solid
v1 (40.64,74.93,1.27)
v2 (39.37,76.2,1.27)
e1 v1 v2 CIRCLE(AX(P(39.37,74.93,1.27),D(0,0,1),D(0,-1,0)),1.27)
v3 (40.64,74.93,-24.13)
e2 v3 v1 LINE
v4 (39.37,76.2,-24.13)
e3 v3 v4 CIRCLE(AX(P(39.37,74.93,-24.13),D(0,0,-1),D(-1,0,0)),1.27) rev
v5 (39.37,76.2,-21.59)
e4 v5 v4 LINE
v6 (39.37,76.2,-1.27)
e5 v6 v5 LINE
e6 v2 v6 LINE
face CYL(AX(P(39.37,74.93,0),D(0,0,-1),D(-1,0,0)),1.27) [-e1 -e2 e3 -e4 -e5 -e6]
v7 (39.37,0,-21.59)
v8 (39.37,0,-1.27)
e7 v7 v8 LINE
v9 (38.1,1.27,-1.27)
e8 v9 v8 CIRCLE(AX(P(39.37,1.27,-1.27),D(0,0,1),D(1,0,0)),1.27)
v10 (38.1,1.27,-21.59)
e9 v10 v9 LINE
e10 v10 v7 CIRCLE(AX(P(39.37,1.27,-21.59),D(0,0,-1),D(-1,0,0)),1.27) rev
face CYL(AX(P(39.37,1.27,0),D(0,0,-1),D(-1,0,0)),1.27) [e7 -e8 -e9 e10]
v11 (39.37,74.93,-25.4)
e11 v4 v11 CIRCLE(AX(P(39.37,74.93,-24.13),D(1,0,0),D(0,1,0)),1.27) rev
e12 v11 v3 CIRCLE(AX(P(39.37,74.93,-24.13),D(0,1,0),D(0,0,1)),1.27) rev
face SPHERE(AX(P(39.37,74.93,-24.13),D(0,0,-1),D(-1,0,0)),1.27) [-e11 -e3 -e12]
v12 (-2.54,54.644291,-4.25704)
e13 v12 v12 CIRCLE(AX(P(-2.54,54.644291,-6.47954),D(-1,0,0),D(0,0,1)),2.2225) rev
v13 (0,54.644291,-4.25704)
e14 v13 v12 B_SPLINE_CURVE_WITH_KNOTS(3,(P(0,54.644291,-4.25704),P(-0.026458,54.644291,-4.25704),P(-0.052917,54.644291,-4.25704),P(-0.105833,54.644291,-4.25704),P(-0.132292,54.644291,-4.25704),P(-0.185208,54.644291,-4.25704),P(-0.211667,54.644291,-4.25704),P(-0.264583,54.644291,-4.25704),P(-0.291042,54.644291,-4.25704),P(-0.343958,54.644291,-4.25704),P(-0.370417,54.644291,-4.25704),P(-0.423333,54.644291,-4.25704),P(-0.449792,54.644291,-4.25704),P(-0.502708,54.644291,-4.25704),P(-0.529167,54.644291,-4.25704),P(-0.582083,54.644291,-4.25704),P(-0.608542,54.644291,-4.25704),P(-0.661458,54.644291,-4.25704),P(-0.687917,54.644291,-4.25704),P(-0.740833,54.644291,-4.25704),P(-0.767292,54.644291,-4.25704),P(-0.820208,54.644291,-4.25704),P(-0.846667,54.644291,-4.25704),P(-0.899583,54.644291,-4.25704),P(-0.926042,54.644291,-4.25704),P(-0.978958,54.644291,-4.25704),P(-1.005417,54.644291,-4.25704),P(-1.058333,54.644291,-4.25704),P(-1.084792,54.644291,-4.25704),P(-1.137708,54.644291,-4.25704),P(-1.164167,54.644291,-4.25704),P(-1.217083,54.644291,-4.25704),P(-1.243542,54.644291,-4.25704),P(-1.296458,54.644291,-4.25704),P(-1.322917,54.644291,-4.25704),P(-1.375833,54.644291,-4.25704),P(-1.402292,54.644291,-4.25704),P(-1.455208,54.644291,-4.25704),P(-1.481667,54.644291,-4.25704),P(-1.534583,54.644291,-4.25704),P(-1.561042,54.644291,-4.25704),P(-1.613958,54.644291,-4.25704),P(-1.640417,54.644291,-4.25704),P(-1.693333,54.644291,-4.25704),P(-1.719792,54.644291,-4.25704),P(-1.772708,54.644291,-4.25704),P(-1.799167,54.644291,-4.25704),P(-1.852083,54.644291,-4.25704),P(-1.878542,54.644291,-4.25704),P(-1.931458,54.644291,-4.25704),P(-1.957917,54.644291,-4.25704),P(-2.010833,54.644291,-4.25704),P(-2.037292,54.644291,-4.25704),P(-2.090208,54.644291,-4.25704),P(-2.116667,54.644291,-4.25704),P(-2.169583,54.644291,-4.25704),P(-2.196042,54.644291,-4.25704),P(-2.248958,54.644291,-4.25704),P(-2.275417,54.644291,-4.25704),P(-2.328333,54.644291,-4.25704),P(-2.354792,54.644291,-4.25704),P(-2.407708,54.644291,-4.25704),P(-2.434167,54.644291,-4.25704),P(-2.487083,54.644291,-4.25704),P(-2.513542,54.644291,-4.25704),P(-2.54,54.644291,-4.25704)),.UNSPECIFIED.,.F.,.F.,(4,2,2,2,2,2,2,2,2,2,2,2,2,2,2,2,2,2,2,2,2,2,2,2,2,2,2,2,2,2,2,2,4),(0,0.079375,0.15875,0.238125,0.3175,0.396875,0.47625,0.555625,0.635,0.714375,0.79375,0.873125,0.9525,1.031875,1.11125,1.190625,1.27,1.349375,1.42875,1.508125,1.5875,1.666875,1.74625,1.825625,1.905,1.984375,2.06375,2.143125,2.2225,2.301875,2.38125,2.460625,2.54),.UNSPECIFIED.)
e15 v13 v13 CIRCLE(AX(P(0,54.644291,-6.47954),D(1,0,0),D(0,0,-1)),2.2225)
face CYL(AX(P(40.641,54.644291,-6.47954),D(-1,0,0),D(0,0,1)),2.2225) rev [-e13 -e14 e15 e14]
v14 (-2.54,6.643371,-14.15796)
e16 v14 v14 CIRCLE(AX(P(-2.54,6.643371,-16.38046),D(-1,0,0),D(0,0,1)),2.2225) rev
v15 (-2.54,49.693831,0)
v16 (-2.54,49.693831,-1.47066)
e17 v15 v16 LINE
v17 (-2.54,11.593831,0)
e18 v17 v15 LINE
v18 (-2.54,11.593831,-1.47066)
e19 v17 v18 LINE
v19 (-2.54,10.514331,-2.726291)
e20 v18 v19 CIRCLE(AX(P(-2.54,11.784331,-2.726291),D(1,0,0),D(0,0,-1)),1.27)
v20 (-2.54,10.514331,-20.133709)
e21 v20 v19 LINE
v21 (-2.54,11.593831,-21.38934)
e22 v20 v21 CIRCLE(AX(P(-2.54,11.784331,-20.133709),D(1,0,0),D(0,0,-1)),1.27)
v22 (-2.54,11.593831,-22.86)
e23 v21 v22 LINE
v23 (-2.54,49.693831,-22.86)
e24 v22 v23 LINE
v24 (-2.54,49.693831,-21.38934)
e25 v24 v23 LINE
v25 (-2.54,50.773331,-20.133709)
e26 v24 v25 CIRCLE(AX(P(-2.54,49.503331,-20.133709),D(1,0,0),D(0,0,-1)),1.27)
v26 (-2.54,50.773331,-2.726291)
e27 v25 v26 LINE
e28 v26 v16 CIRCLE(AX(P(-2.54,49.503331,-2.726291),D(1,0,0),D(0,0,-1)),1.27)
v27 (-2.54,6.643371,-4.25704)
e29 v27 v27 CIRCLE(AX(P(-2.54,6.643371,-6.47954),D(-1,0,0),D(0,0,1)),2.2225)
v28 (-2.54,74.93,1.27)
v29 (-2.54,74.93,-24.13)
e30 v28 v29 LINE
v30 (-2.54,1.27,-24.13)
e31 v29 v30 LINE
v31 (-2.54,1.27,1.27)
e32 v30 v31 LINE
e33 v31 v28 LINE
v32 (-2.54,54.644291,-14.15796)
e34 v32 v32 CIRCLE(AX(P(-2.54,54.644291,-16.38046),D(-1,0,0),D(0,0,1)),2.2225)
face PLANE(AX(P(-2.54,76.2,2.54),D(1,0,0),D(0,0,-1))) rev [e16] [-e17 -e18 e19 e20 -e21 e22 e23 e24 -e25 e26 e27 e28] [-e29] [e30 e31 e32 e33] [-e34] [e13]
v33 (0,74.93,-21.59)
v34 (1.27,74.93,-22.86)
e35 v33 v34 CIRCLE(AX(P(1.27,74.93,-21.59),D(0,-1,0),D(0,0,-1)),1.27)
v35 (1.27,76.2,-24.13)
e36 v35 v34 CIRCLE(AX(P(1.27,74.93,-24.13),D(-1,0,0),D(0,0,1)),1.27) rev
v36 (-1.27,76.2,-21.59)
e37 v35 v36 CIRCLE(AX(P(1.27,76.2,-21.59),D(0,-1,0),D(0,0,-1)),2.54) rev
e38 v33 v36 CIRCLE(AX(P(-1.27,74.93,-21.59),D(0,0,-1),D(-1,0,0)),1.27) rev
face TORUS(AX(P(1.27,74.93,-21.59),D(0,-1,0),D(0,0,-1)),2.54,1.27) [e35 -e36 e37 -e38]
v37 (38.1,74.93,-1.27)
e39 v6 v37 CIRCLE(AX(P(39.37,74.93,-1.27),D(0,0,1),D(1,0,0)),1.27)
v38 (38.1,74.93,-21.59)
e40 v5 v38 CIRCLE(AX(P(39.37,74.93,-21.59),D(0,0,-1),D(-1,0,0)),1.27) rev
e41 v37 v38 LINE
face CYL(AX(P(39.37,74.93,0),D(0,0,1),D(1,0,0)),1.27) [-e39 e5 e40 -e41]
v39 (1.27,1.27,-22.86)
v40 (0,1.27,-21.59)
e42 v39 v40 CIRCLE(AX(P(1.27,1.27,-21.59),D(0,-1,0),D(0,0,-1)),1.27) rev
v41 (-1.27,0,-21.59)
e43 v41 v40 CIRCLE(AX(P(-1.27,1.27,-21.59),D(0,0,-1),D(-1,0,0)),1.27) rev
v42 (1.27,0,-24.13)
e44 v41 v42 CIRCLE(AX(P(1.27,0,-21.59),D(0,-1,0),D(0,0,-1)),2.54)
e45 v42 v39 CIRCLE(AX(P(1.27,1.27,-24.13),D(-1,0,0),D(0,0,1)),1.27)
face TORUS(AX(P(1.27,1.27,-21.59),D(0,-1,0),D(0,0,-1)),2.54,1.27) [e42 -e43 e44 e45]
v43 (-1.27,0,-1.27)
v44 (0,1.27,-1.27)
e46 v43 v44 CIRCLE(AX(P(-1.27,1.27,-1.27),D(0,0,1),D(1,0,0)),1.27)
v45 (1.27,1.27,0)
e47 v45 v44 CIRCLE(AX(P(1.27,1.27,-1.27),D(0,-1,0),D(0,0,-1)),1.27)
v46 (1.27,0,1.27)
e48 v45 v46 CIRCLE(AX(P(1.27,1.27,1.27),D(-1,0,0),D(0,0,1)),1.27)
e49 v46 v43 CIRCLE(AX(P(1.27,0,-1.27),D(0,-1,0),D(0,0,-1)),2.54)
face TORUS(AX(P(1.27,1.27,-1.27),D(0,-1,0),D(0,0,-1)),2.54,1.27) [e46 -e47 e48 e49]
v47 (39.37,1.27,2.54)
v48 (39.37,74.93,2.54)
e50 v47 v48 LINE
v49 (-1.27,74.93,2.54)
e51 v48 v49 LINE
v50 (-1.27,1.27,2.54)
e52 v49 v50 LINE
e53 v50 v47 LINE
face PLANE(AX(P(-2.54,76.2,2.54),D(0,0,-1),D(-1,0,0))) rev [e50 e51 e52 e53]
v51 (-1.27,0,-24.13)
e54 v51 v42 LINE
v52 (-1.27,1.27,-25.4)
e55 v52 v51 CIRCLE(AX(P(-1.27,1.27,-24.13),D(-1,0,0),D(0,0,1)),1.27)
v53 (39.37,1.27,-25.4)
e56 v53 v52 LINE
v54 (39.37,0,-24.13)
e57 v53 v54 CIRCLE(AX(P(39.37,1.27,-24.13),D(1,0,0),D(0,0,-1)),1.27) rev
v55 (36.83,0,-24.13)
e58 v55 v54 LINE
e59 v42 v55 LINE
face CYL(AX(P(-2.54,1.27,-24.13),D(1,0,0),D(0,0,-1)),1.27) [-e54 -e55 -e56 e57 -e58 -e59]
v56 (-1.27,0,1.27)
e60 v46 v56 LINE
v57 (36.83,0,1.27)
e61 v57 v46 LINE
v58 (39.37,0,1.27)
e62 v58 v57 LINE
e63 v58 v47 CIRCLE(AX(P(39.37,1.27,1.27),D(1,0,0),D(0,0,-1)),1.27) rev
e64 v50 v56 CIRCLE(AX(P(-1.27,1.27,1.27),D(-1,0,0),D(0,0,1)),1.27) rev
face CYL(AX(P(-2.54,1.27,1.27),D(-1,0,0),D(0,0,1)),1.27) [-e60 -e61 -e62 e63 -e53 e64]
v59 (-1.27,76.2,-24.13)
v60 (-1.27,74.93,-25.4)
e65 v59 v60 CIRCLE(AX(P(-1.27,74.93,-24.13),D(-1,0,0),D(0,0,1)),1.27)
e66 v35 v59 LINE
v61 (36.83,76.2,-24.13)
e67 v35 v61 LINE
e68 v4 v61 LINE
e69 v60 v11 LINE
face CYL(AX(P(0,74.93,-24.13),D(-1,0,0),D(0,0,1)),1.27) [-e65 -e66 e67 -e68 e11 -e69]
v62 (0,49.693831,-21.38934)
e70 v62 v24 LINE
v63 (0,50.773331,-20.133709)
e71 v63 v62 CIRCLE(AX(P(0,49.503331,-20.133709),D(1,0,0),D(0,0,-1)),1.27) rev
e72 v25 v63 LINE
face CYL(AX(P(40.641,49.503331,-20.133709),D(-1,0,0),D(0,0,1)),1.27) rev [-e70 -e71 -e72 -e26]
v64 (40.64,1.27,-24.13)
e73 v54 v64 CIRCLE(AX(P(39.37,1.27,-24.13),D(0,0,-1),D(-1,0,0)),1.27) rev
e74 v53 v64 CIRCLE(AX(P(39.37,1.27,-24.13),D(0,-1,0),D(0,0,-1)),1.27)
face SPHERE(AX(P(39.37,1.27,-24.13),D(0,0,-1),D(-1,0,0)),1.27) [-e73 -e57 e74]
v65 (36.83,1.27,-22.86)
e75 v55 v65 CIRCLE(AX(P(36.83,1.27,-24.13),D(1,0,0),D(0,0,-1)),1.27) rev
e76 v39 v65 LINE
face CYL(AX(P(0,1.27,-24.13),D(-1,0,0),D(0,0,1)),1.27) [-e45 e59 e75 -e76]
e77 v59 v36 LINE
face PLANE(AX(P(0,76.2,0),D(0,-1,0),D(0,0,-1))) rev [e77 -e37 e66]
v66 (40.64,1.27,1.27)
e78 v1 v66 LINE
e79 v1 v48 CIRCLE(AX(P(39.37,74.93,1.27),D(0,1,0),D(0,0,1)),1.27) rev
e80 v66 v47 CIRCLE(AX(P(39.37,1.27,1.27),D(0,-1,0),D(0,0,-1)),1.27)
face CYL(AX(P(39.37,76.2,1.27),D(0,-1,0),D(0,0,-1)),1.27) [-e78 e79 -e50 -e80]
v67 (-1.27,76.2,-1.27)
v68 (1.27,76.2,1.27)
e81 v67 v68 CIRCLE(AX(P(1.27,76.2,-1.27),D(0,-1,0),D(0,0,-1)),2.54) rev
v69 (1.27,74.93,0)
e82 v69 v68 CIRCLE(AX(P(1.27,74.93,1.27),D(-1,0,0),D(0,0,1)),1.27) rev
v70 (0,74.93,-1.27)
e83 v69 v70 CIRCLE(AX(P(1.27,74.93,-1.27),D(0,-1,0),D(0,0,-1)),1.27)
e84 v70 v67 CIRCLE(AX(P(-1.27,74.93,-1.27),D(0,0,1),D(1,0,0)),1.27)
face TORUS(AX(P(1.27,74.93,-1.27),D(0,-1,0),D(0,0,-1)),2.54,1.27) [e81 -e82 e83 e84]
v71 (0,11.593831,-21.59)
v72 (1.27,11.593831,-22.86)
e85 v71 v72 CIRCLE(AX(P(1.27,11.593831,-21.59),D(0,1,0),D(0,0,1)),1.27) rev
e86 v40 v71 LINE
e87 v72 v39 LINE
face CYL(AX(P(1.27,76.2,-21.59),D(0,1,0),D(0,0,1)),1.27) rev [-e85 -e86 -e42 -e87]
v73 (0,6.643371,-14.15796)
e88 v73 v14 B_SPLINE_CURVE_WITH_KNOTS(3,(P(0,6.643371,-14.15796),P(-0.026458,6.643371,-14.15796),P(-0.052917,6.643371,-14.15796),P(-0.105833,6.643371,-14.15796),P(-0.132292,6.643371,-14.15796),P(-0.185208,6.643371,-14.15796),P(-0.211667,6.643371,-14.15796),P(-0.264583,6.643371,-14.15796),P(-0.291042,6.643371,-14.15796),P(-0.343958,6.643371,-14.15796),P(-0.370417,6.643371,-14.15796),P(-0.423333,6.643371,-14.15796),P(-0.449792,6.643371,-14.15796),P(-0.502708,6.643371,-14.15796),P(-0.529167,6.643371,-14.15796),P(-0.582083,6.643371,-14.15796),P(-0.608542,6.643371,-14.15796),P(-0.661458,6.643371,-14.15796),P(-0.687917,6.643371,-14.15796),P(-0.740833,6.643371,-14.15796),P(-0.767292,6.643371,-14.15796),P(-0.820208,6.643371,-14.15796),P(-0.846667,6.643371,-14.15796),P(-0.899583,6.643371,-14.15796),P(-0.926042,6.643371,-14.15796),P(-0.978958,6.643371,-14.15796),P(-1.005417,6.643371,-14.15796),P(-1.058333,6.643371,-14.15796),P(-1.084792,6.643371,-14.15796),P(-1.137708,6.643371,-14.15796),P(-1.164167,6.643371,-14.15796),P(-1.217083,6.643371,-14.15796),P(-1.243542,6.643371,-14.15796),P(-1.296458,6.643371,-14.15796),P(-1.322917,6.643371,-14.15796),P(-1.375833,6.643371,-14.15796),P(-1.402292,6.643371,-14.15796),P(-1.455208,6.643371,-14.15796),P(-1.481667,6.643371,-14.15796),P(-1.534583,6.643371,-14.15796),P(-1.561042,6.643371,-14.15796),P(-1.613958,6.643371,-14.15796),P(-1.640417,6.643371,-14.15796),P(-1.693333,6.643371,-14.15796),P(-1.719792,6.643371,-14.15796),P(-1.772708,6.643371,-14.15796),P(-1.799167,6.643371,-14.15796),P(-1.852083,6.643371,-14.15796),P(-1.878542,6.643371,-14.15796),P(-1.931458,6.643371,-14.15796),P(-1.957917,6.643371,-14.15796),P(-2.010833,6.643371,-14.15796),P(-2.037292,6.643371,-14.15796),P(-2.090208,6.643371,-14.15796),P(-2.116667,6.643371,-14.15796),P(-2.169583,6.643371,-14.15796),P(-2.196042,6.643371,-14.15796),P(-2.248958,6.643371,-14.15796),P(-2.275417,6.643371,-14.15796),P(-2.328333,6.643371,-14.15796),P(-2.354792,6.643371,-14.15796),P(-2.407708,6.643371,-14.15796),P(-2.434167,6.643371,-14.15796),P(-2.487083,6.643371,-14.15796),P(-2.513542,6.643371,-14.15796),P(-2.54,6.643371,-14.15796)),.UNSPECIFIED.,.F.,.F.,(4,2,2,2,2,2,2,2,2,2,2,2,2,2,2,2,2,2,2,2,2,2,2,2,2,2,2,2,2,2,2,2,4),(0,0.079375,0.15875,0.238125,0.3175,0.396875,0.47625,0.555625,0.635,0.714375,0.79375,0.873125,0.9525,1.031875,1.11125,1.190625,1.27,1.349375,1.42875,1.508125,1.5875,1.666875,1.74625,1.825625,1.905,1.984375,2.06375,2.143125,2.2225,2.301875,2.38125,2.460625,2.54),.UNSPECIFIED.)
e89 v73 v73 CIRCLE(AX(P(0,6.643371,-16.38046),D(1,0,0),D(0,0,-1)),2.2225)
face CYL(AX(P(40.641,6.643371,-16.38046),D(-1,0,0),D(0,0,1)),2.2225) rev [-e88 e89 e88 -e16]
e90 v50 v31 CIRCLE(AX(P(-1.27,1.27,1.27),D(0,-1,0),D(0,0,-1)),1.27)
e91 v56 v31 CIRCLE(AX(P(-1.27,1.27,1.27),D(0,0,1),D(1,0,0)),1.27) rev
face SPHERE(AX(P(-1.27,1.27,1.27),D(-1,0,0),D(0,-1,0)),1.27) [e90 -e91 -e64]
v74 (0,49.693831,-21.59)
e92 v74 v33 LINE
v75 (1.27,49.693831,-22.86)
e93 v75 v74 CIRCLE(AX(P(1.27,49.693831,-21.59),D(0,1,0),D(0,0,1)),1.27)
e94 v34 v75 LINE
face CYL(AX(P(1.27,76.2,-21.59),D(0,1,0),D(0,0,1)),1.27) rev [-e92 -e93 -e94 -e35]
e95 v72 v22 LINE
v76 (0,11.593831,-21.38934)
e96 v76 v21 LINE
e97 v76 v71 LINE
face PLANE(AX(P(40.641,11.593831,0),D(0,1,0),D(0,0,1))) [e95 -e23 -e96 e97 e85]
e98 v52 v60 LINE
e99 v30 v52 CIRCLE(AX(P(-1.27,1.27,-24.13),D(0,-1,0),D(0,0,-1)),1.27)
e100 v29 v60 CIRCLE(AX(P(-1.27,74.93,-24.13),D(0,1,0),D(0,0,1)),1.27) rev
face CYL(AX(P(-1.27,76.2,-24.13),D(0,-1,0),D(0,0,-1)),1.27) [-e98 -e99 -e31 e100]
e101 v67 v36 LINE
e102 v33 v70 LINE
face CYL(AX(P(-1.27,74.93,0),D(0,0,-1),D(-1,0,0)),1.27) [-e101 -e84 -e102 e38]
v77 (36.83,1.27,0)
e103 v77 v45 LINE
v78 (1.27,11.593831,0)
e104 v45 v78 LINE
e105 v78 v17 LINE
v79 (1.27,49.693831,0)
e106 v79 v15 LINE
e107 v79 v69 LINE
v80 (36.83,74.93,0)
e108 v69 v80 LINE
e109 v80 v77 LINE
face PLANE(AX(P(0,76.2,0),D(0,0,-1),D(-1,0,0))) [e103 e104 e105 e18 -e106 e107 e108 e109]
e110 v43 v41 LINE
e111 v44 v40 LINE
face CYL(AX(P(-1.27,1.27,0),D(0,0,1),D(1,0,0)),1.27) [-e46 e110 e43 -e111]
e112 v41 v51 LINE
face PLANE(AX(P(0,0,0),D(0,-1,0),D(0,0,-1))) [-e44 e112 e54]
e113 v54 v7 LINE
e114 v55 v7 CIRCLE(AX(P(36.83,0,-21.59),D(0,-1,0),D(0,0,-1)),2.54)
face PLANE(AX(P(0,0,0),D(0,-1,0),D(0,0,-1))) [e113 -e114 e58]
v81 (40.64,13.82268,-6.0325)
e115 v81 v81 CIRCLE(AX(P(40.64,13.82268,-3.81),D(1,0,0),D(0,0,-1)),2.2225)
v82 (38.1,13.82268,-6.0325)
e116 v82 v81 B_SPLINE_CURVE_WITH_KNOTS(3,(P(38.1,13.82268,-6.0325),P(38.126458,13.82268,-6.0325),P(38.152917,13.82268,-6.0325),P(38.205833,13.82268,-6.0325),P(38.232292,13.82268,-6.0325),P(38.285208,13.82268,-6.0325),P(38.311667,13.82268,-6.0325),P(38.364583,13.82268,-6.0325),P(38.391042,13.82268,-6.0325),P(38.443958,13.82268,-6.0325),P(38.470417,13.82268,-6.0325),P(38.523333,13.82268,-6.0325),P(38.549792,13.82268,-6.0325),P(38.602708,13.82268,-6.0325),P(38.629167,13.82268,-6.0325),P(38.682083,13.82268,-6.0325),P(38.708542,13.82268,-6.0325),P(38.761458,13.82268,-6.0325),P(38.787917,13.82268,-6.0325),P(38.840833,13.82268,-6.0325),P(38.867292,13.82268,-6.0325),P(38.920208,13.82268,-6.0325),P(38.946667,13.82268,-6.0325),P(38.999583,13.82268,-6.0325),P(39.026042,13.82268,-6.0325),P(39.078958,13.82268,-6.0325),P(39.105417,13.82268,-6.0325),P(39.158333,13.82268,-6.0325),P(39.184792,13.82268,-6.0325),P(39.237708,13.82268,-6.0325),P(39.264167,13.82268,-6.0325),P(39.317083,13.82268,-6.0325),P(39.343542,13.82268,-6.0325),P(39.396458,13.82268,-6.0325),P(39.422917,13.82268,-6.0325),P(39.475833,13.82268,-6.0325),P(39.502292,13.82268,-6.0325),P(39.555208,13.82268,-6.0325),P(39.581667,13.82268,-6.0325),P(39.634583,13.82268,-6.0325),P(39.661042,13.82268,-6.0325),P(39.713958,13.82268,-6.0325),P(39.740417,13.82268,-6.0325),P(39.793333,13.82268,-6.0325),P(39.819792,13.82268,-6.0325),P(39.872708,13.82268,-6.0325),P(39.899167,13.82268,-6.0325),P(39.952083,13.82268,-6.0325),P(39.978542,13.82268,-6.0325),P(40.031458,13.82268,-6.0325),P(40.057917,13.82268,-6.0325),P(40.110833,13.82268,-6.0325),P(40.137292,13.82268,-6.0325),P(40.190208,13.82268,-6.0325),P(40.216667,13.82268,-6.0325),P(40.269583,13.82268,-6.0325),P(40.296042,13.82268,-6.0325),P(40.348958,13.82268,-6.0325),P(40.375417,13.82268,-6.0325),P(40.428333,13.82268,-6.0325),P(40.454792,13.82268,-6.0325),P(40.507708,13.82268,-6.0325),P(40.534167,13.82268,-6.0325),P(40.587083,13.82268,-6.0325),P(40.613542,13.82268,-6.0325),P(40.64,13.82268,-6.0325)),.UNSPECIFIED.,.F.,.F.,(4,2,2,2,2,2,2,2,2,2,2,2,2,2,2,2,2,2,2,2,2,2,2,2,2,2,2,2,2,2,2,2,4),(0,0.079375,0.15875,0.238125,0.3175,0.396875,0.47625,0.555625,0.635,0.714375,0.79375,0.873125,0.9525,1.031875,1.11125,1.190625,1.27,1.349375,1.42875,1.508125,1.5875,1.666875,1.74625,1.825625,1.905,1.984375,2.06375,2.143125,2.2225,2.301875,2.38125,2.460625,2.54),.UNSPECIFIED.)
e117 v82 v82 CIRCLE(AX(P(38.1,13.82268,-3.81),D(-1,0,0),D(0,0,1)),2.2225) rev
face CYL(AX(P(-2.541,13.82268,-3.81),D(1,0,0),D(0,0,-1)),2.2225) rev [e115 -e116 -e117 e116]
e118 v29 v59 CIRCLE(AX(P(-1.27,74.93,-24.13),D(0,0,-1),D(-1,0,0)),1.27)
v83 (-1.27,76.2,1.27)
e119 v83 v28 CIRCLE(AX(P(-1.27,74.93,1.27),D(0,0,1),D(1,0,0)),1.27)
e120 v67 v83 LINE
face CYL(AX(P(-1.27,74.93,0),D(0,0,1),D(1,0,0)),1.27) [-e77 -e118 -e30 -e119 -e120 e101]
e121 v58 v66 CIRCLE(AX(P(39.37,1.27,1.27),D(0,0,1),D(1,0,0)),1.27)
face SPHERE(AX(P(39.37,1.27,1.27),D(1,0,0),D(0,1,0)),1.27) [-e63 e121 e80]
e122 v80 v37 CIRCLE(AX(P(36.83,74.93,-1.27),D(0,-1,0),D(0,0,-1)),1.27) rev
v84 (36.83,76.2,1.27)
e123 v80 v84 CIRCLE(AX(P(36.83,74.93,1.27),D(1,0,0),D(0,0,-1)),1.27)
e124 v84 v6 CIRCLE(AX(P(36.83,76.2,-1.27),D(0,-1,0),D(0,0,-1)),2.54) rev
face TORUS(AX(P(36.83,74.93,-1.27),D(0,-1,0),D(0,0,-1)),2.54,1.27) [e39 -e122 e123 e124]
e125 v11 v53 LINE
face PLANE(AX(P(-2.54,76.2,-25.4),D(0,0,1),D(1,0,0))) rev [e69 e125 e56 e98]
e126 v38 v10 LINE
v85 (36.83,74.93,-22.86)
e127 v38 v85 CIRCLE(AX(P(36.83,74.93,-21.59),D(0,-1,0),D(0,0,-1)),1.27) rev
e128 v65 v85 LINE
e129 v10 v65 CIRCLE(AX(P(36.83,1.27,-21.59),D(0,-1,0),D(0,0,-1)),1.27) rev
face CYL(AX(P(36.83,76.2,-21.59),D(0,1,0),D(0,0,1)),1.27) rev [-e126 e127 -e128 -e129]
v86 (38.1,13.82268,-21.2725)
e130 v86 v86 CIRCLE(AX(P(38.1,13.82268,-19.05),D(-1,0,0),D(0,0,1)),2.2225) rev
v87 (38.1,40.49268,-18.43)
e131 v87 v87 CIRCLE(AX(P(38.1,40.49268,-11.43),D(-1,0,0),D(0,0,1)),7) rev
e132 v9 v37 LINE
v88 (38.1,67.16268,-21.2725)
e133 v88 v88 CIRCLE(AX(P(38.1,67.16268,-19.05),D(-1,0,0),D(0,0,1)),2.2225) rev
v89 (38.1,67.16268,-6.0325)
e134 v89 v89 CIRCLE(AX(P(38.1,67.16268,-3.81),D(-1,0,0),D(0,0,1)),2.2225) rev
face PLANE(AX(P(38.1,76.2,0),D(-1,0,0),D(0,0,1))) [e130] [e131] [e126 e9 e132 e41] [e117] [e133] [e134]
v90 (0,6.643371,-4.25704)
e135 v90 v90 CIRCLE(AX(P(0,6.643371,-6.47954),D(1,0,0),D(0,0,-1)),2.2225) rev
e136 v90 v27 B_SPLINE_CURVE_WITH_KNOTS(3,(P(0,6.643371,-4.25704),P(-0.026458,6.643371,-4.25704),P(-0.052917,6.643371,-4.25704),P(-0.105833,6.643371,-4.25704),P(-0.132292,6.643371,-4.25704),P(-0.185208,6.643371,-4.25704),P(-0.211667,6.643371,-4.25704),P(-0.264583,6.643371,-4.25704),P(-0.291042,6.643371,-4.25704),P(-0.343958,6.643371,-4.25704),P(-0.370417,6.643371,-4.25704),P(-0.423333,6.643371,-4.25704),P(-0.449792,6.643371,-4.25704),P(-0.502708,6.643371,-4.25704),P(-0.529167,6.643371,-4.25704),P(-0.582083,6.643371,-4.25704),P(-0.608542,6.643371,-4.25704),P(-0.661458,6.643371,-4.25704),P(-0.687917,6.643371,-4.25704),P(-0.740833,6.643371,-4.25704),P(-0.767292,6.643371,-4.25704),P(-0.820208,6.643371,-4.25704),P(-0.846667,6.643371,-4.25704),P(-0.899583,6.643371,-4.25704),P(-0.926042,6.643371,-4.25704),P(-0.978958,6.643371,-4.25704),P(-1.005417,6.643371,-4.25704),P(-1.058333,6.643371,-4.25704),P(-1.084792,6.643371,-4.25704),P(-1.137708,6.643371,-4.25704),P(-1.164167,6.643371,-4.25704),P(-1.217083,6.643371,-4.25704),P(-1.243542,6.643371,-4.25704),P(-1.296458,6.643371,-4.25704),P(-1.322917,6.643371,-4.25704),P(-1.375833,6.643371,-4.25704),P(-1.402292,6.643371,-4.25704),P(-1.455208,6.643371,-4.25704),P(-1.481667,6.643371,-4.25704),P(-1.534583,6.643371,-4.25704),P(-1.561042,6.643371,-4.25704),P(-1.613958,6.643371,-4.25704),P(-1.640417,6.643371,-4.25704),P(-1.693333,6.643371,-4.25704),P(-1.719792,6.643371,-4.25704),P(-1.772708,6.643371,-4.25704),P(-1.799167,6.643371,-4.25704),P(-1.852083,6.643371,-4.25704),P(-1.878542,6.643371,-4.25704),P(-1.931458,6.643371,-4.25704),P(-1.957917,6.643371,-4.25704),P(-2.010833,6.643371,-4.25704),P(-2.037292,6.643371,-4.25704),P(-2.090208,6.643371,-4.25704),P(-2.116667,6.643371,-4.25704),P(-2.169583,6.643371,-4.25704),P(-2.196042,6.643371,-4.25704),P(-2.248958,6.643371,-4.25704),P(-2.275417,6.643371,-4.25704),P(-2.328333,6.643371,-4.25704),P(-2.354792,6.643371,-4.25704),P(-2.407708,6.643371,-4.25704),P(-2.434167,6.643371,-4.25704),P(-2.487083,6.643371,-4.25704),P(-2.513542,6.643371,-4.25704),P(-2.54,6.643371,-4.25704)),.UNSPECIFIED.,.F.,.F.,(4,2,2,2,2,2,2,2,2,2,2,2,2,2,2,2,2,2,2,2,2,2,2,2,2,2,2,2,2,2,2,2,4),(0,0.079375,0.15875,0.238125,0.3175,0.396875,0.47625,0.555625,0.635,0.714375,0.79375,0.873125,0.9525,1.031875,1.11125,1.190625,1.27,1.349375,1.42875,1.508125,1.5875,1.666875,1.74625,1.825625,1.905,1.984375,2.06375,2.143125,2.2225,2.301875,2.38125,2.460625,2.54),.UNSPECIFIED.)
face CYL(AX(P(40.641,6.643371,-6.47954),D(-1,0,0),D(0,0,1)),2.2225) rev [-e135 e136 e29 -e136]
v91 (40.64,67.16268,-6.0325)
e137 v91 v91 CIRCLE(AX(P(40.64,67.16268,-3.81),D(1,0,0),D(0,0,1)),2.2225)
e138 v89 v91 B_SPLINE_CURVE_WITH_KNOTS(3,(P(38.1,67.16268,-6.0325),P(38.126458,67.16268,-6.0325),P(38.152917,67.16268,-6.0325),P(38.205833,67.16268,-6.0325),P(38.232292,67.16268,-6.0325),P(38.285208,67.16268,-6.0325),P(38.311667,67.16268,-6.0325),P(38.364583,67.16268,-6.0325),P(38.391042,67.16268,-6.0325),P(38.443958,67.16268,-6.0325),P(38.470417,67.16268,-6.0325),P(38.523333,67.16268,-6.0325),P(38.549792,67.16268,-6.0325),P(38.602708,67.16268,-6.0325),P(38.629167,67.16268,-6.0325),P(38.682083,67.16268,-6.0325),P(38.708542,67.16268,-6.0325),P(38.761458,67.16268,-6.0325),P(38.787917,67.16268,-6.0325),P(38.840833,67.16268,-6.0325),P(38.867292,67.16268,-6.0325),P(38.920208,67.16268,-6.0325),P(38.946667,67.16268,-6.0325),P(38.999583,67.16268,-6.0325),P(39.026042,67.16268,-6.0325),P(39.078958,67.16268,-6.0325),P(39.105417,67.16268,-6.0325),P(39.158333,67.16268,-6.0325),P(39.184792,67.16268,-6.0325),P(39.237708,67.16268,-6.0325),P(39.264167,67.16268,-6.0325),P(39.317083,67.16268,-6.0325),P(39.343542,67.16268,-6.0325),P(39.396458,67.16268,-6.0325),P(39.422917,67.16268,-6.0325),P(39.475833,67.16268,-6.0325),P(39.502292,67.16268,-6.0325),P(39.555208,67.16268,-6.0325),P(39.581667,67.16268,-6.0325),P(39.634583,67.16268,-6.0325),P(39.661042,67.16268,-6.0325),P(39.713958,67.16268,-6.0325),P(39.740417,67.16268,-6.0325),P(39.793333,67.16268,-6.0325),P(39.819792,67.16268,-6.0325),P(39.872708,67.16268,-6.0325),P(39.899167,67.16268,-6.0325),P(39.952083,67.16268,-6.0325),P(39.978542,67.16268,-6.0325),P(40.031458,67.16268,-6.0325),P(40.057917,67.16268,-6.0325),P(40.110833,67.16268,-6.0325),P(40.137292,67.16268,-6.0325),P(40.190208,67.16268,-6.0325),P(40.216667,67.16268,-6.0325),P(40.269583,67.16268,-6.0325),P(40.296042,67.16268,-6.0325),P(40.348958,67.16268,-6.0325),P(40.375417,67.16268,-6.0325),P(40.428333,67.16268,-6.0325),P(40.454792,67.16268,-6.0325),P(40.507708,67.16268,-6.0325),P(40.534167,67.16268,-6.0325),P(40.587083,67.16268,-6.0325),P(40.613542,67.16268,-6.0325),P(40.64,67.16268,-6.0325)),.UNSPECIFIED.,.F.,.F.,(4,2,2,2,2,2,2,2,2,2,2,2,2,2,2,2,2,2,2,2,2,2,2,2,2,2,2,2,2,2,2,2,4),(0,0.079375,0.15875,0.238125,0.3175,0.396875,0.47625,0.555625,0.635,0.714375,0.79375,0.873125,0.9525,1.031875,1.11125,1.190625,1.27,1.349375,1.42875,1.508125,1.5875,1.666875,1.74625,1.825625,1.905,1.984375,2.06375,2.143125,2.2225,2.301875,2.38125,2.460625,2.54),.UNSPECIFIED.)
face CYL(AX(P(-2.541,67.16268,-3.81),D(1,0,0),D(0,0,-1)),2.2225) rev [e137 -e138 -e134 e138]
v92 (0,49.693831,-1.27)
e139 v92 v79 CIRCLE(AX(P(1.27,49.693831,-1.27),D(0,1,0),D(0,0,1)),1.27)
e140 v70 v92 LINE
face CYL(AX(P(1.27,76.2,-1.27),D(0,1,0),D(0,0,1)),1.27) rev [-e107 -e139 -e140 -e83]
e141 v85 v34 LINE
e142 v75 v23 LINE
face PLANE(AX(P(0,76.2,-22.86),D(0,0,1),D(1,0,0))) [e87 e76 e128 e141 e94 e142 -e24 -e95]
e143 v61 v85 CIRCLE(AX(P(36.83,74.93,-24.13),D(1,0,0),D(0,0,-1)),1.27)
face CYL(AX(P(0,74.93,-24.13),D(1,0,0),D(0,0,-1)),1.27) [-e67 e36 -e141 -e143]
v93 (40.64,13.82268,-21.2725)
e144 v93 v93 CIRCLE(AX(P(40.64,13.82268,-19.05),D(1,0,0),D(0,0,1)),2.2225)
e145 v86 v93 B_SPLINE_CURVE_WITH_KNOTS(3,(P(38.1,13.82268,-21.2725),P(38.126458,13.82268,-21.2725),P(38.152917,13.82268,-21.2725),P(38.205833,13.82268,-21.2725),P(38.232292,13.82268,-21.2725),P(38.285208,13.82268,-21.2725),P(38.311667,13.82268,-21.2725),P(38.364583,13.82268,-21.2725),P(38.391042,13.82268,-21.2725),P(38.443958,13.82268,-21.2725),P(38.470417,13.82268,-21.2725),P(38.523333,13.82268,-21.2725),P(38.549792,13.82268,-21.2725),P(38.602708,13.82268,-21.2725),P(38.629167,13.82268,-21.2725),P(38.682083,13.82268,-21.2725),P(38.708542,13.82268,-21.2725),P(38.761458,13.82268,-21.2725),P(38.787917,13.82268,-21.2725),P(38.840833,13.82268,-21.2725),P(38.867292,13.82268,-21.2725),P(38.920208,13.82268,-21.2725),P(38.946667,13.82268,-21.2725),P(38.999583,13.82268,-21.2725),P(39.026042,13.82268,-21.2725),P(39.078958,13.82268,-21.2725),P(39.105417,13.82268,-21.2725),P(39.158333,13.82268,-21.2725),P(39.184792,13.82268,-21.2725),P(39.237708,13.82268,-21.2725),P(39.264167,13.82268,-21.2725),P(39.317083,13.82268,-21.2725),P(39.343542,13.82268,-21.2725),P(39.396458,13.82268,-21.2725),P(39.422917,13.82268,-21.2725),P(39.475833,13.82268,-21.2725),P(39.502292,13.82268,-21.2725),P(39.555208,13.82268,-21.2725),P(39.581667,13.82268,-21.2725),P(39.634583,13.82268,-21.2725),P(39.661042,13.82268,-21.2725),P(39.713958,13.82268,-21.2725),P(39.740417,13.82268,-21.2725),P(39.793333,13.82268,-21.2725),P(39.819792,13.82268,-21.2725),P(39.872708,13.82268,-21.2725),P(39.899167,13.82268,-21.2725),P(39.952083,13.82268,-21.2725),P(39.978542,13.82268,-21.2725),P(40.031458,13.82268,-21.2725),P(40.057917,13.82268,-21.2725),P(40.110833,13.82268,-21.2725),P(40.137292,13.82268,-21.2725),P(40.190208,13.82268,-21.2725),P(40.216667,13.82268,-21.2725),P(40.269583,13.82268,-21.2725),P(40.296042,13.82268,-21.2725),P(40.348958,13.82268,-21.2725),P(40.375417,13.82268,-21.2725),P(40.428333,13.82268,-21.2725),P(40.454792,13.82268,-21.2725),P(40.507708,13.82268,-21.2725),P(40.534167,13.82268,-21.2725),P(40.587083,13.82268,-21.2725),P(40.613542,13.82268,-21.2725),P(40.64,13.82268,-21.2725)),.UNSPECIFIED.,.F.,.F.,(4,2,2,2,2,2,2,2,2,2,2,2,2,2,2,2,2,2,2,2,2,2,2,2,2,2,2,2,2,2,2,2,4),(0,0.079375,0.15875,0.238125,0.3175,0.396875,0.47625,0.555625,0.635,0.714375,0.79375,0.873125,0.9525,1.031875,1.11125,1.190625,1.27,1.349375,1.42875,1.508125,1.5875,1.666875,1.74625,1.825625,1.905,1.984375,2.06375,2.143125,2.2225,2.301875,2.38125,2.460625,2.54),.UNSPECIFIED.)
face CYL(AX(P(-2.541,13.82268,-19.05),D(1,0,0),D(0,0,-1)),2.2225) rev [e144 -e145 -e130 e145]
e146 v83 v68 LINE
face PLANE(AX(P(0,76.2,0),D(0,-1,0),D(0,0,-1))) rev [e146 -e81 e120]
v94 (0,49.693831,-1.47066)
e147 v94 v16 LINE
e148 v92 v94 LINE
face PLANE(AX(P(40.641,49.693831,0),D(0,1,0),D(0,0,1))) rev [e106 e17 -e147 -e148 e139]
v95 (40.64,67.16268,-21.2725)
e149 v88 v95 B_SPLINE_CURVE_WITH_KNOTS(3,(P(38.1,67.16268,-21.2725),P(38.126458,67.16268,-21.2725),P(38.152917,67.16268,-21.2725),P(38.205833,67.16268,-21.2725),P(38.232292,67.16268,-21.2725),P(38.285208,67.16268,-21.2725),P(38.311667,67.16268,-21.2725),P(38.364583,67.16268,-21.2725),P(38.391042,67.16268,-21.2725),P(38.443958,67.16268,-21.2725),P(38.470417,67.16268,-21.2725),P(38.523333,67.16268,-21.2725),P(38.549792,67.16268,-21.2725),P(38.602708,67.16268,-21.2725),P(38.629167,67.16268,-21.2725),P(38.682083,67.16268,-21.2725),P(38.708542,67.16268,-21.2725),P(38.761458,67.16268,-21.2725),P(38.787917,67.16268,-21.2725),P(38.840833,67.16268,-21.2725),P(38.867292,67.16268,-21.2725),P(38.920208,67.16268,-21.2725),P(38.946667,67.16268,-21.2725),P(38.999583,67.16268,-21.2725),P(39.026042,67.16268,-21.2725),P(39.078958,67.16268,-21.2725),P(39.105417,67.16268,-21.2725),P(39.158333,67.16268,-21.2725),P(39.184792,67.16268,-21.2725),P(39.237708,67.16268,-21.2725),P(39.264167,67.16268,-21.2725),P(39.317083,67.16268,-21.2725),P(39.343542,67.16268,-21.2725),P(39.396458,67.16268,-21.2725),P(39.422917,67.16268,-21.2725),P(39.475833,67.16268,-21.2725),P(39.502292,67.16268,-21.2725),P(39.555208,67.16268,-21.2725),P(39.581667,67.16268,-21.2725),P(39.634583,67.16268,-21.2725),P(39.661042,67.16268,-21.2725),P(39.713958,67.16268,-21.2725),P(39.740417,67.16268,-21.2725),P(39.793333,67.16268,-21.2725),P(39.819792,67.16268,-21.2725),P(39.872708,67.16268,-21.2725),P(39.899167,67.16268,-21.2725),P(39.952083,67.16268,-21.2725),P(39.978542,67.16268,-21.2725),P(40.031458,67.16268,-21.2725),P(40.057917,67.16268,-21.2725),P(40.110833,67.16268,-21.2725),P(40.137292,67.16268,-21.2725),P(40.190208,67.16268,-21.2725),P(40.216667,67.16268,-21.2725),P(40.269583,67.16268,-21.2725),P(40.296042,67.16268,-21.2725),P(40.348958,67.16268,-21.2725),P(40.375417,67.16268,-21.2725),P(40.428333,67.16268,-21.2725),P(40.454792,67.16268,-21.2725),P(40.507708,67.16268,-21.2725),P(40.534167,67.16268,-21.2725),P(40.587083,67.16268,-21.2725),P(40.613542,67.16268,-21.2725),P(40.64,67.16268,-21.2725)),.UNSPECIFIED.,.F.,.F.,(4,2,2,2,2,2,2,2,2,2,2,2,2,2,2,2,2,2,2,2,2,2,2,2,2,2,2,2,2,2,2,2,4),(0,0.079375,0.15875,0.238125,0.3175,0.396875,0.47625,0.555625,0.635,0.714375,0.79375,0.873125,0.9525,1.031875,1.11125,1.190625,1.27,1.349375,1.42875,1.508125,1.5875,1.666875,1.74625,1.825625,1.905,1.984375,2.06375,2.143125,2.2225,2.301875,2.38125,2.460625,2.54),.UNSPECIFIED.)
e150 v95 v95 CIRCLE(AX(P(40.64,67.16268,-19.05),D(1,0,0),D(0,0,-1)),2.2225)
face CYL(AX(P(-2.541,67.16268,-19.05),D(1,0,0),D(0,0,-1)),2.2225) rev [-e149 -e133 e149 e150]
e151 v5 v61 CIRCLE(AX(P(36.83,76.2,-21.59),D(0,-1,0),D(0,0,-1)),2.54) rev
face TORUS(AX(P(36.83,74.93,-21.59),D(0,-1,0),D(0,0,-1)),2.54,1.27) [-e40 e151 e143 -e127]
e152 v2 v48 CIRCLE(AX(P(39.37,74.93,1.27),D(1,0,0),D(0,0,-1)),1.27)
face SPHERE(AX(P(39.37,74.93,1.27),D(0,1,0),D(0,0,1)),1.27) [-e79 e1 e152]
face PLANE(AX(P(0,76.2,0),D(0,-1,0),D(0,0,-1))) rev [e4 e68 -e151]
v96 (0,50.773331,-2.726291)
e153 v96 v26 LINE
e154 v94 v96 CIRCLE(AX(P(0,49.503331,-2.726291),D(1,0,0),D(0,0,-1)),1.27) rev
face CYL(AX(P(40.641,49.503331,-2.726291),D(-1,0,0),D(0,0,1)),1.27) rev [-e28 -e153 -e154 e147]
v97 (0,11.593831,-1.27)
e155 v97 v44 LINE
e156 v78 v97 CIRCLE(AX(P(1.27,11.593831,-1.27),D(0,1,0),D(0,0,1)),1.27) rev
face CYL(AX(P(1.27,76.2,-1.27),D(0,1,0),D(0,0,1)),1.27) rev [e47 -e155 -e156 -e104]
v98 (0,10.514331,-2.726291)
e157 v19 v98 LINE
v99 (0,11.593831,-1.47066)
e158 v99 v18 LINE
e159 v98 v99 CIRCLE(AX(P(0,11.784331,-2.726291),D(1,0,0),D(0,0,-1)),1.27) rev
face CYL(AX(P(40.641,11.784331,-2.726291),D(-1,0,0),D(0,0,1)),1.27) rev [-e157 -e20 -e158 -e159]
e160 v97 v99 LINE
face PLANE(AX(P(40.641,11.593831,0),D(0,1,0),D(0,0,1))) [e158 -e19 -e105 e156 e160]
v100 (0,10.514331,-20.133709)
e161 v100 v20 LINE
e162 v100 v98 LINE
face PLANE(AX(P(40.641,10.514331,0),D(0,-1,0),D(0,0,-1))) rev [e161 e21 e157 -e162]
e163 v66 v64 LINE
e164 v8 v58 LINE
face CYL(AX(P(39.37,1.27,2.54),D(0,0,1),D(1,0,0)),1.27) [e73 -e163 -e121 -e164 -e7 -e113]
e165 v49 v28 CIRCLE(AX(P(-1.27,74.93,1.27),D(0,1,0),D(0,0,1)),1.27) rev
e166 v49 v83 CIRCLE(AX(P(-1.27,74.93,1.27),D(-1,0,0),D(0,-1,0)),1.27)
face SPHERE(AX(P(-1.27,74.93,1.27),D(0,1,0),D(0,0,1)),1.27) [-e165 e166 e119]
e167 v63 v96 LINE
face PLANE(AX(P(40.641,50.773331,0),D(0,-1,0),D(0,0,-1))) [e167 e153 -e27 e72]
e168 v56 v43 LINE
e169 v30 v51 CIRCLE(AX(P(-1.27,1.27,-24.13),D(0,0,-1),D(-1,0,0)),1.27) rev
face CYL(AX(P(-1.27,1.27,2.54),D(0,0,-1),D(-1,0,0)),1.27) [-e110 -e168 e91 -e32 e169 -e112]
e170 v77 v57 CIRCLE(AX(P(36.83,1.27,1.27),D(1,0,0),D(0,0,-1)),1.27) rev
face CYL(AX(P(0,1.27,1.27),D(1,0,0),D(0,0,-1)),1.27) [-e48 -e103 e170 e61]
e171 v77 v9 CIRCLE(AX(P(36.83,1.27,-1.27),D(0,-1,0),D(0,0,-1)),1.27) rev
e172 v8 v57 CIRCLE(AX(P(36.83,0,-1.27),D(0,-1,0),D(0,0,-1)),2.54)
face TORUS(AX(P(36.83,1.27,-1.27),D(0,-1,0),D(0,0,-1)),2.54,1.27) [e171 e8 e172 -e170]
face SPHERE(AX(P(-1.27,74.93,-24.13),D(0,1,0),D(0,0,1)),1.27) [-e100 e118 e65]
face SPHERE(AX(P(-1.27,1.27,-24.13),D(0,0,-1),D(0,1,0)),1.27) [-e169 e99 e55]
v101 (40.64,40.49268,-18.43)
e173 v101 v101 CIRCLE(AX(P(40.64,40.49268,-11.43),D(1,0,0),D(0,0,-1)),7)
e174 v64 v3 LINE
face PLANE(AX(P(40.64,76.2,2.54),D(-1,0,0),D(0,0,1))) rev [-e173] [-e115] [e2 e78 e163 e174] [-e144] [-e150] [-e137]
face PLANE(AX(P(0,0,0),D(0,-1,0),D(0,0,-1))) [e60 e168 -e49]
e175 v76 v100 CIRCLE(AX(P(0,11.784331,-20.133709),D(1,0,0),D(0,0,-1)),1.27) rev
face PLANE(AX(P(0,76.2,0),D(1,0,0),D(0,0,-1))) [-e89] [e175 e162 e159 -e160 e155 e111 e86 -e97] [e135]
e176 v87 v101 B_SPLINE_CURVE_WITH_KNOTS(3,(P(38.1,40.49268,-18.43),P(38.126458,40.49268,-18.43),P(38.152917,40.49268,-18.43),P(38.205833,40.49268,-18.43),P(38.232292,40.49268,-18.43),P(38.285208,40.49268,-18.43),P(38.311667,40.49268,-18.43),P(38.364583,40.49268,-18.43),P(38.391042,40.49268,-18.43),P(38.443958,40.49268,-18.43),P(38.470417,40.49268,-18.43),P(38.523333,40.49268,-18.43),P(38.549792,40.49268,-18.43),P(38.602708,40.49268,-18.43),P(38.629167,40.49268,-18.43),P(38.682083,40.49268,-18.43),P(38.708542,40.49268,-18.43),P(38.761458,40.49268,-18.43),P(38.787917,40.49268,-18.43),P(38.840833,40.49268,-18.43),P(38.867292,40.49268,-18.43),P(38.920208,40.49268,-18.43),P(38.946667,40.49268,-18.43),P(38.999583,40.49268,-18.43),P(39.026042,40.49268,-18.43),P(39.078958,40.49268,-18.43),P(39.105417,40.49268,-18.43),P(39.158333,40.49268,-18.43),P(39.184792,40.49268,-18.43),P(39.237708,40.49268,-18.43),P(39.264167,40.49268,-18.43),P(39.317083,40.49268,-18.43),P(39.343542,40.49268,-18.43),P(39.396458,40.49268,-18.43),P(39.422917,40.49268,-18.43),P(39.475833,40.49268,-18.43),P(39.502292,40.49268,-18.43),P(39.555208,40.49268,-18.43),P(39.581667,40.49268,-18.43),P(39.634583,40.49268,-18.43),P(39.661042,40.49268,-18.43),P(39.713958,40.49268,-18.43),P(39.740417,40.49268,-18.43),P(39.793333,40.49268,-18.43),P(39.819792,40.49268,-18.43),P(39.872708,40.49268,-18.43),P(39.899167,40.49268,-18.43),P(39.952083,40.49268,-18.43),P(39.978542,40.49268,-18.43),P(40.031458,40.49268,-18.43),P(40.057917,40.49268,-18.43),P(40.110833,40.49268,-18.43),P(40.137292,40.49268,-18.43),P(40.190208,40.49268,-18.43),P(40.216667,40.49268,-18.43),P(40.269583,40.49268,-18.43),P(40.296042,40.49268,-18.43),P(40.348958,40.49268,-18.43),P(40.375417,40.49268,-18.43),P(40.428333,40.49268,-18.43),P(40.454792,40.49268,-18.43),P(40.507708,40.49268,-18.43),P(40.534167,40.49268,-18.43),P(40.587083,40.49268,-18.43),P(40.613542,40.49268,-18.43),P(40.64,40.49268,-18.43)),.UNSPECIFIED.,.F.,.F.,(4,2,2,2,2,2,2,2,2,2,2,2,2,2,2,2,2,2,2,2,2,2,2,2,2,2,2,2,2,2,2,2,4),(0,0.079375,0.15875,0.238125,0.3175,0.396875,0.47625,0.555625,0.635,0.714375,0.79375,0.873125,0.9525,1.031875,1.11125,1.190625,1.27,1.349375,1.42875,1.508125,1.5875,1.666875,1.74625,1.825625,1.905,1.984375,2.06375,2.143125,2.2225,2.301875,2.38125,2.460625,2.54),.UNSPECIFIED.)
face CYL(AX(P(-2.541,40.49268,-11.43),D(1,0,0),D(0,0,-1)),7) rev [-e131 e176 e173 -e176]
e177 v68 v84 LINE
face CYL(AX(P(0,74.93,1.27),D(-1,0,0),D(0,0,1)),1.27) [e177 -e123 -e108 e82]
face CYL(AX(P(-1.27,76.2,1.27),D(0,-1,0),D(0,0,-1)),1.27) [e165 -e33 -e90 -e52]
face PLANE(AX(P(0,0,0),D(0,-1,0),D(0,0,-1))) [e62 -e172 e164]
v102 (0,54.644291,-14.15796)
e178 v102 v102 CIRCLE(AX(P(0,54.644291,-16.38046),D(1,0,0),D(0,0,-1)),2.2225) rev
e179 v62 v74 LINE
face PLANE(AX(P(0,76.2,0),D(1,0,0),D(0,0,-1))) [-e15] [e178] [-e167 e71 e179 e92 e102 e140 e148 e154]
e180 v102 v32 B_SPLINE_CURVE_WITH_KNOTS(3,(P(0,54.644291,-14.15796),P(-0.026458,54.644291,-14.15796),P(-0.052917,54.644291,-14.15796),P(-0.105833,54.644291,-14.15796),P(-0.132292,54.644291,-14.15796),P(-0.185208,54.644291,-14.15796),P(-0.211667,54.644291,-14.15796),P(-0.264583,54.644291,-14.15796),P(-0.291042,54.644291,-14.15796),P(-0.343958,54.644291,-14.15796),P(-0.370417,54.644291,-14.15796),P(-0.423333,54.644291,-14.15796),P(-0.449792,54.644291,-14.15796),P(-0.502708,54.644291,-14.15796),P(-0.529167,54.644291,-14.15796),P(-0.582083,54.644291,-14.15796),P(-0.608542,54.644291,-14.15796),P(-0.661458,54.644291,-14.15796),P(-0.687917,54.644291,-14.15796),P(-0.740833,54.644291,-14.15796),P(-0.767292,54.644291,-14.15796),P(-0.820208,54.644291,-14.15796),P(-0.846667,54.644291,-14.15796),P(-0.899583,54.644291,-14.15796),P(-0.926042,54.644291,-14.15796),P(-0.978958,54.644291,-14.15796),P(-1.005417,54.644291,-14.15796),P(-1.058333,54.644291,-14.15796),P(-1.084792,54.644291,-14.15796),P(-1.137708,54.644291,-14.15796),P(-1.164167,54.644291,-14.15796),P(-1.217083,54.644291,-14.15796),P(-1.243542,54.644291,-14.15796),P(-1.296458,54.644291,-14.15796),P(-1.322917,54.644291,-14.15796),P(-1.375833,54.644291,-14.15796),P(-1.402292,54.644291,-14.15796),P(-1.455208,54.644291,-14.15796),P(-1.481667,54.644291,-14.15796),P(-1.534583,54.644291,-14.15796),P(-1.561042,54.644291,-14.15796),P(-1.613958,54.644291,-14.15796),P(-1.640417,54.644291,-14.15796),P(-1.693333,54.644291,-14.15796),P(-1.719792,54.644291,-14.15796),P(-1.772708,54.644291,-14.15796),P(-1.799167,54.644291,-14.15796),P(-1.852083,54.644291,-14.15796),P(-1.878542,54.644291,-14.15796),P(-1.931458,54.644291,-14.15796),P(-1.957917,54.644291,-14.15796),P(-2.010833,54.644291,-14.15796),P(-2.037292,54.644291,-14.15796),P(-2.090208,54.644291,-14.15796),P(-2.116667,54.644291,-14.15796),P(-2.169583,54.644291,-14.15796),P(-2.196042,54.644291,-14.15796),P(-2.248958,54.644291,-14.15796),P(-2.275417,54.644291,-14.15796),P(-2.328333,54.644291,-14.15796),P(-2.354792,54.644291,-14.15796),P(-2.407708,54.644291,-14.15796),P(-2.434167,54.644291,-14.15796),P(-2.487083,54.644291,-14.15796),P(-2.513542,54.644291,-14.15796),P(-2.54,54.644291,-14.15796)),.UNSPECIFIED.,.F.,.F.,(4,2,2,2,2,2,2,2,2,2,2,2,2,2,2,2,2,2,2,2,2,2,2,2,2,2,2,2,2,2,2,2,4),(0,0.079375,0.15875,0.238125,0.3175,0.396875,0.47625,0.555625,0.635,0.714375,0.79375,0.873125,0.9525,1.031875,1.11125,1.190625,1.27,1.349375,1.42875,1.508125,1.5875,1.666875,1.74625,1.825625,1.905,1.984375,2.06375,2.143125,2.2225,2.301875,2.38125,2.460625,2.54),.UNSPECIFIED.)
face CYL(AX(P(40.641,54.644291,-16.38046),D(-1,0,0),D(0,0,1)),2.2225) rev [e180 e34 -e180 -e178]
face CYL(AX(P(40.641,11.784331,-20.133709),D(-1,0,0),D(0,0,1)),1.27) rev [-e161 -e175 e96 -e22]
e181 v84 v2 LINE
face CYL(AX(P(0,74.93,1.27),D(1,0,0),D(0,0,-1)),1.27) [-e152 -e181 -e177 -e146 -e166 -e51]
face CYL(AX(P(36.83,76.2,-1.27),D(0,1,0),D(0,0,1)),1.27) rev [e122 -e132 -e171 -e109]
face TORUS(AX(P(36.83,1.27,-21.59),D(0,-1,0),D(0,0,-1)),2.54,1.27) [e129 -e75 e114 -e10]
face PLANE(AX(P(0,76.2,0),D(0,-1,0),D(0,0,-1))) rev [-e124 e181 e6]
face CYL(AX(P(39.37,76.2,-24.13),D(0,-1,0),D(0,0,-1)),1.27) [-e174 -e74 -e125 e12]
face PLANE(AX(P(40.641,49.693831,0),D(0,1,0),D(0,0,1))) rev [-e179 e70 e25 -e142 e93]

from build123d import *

# Parameters (mm, degrees)
SKETCH1_W           = 43.18
SKETCH1_H           = 27.94
SKETCH1_W_2         = 38.1
SKETCH1_H_2         = 22.86
BOSS_EXTRUDE1_DEPTH = 76.2
CUT_EXTRUDE1_REACH  = 93.193
SKETCH3_R           = 2.2225
SKETCH3_R_2         = 6.99999997
CUT_EXTRUDE2_REACH  = 93.193
SKETCH2_W           = 19.91868
SKETCH2_H           = 38.1
SKETCH2_W_2         = 1.47066
SKETCH2_H_2         = 1.0795
SKETCH2_R           = 2.2225
FILLET1_R           = 1.27
FILLET2_R           = 1.27


# Some blends are built 0.0001 mm under size
with BuildPart() as part:
    # Sketch1 → Boss-Extrude1 (new body)
    with BuildSketch(Plane(origin=(0, 0, 0), x_dir=(1, 0, 0), z_dir=(0, 1, 0))):
        with Locations((19.05, 11.43)):
            Rectangle(SKETCH1_W, SKETCH1_H)
        with Locations((19.05, 11.43)):
            Rectangle(SKETCH1_W_2, SKETCH1_H_2, mode=Mode.SUBTRACT)
    extrude(amount=BOSS_EXTRUDE1_DEPTH)

    # Sketch3 → Cut-Extrude1 (cut, up to next)
    with BuildSketch(Plane(origin=(40.64, 0, 0), x_dir=(0, 0, -1), z_dir=(1, 0, 0)), mode=Mode.PRIVATE) as cut_extrude1_sk1:
        with Locations((19.05, 67.16268)):
            Circle(SKETCH3_R)
    cut_extrude1_tool1 = extrude(cut_extrude1_sk1.sketch, amount=-CUT_EXTRUDE1_REACH, mode=Mode.PRIVATE) & part.part
    # Sketch3 → Cut-Extrude1 (cut, up to next)
    with BuildSketch(Plane(origin=(40.64, 0, 0), x_dir=(0, 0, -1), z_dir=(1, 0, 0)), mode=Mode.PRIVATE) as cut_extrude1_sk2:
        with Locations((3.81, 67.16268)):
            Circle(SKETCH3_R)
    cut_extrude1_tool2 = extrude(cut_extrude1_sk2.sketch, amount=-CUT_EXTRUDE1_REACH, mode=Mode.PRIVATE) & part.part
    # Sketch3 → Cut-Extrude1 (cut, up to next)
    with BuildSketch(Plane(origin=(40.64, 0, 0), x_dir=(0, 0, -1), z_dir=(1, 0, 0)), mode=Mode.PRIVATE) as cut_extrude1_sk3:
        with Locations((19.05, 13.82268)):
            Circle(SKETCH3_R)
    cut_extrude1_tool3 = extrude(cut_extrude1_sk3.sketch, amount=-CUT_EXTRUDE1_REACH, mode=Mode.PRIVATE) & part.part
    # Sketch3 → Cut-Extrude1 (cut, up to next)
    with BuildSketch(Plane(origin=(40.64, 0, 0), x_dir=(0, 0, -1), z_dir=(1, 0, 0)), mode=Mode.PRIVATE) as cut_extrude1_sk4:
        with Locations((3.81, 13.82268)):
            Circle(SKETCH3_R)
    cut_extrude1_tool4 = extrude(cut_extrude1_sk4.sketch, amount=-CUT_EXTRUDE1_REACH, mode=Mode.PRIVATE) & part.part
    # Sketch3 → Cut-Extrude1 (cut, up to next)
    with BuildSketch(Plane(origin=(40.64, 0, 0), x_dir=(0, 0, -1), z_dir=(1, 0, 0)), mode=Mode.PRIVATE) as cut_extrude1_sk5:
        with Locations((11.43, 40.49268)):
            Circle(SKETCH3_R_2)
    cut_extrude1_tool5 = extrude(cut_extrude1_sk5.sketch, amount=-CUT_EXTRUDE1_REACH, mode=Mode.PRIVATE) & part.part
    add(cut_extrude1_tool1.solids().sort_by_distance((40.64, 67.16268, -19.05))[0], mode=Mode.SUBTRACT)
    add(cut_extrude1_tool2.solids().sort_by_distance((40.64, 67.16268, -3.81))[0], mode=Mode.SUBTRACT)
    add(cut_extrude1_tool3.solids().sort_by_distance((40.64, 13.82268, -19.05))[0], mode=Mode.SUBTRACT)
    add(cut_extrude1_tool4.solids().sort_by_distance((40.64, 13.82268, -3.81))[0], mode=Mode.SUBTRACT)
    add(cut_extrude1_tool5.solids().sort_by_distance((40.64, 40.49268, -11.43))[0], mode=Mode.SUBTRACT)

    # Sketch2 → Cut-Extrude2 (cut, up to next)
    with BuildSketch(Plane.ZY.offset(2.54), mode=Mode.PRIVATE) as cut_extrude2_sk1:
        with Locations((-11.43, 30.64383099)):
            Rectangle(SKETCH2_W, SKETCH2_H)
    cut_extrude2_tool1 = extrude(cut_extrude2_sk1.sketch, amount=-CUT_EXTRUDE2_REACH, mode=Mode.PRIVATE) & part.part
    # Sketch2 → Cut-Extrude2 (cut, up to next)
    with BuildSketch(Plane.ZY.offset(2.54), mode=Mode.PRIVATE) as cut_extrude2_sk2:
        with Locations((-22.12467, 30.64383099)):
            Rectangle(SKETCH2_W_2, SKETCH2_H)
    cut_extrude2_tool2 = extrude(cut_extrude2_sk2.sketch, amount=-CUT_EXTRUDE2_REACH, mode=Mode.PRIVATE) & part.part
    # Sketch2 → Cut-Extrude2 (cut, up to next)
    with BuildSketch(Plane.ZY.offset(2.54), mode=Mode.PRIVATE) as cut_extrude2_sk3:
        with Locations((-11.43, 50.23358099)):
            Rectangle(SKETCH2_W, SKETCH2_H_2)
    cut_extrude2_tool3 = extrude(cut_extrude2_sk3.sketch, amount=-CUT_EXTRUDE2_REACH, mode=Mode.PRIVATE) & part.part
    # Sketch2 → Cut-Extrude2 (cut, up to next)
    with BuildSketch(Plane.ZY.offset(2.54), mode=Mode.PRIVATE) as cut_extrude2_sk4:
        with Locations((-0.73533, 30.64383099)):
            Rectangle(SKETCH2_W_2, SKETCH2_H)
    cut_extrude2_tool4 = extrude(cut_extrude2_sk4.sketch, amount=-CUT_EXTRUDE2_REACH, mode=Mode.PRIVATE) & part.part
    # Sketch2 → Cut-Extrude2 (cut, up to next)
    with BuildSketch(Plane.ZY.offset(2.54), mode=Mode.PRIVATE) as cut_extrude2_sk5:
        with Locations((-11.43, 11.05408099)):
            Rectangle(SKETCH2_W, SKETCH2_H_2)
    cut_extrude2_tool5 = extrude(cut_extrude2_sk5.sketch, amount=-CUT_EXTRUDE2_REACH, mode=Mode.PRIVATE) & part.part
    # Sketch2 → Cut-Extrude2 (cut, up to next)
    with BuildSketch(Plane.ZY.offset(2.54), mode=Mode.PRIVATE) as cut_extrude2_sk6:
        with Locations((-6.47954, 6.64337099)):
            Circle(SKETCH2_R)
    cut_extrude2_tool6 = extrude(cut_extrude2_sk6.sketch, amount=-CUT_EXTRUDE2_REACH, mode=Mode.PRIVATE) & part.part
    # Sketch2 → Cut-Extrude2 (cut, up to next)
    with BuildSketch(Plane.ZY.offset(2.54), mode=Mode.PRIVATE) as cut_extrude2_sk7:
        with Locations((-16.38046, 6.64337099)):
            Circle(SKETCH2_R)
    cut_extrude2_tool7 = extrude(cut_extrude2_sk7.sketch, amount=-CUT_EXTRUDE2_REACH, mode=Mode.PRIVATE) & part.part
    # Sketch2 → Cut-Extrude2 (cut, up to next)
    with BuildSketch(Plane.ZY.offset(2.54), mode=Mode.PRIVATE) as cut_extrude2_sk8:
        with Locations((-16.38046, 54.64429099)):
            Circle(SKETCH2_R)
    cut_extrude2_tool8 = extrude(cut_extrude2_sk8.sketch, amount=-CUT_EXTRUDE2_REACH, mode=Mode.PRIVATE) & part.part
    # Sketch2 → Cut-Extrude2 (cut, up to next)
    with BuildSketch(Plane.ZY.offset(2.54), mode=Mode.PRIVATE) as cut_extrude2_sk9:
        with Locations((-6.47954, 54.64429099)):
            Circle(SKETCH2_R)
    cut_extrude2_tool9 = extrude(cut_extrude2_sk9.sketch, amount=-CUT_EXTRUDE2_REACH, mode=Mode.PRIVATE) & part.part
    add(cut_extrude2_tool1.solids().sort_by_distance((-2.54, 30.643831, -11.43))[0], mode=Mode.SUBTRACT)
    add(cut_extrude2_tool2.solids().sort_by_distance((-2.54, 30.643831, -22.12467))[0], mode=Mode.SUBTRACT)
    add(cut_extrude2_tool3.solids().sort_by_distance((-2.54, 50.233581, -11.43))[0], mode=Mode.SUBTRACT)
    add(cut_extrude2_tool4.solids().sort_by_distance((-2.54, 30.643831, -0.73533))[0], mode=Mode.SUBTRACT)
    add(cut_extrude2_tool5.solids().sort_by_distance((-2.54, 11.054081, -11.43))[0], mode=Mode.SUBTRACT)
    add(cut_extrude2_tool6.solids().sort_by_distance((-2.54, 6.643371, -6.47954))[0], mode=Mode.SUBTRACT)
    add(cut_extrude2_tool7.solids().sort_by_distance((-2.54, 6.643371, -16.38046))[0], mode=Mode.SUBTRACT)
    add(cut_extrude2_tool8.solids().sort_by_distance((-2.54, 54.644291, -16.38046))[0], mode=Mode.SUBTRACT)
    add(cut_extrude2_tool9.solids().sort_by_distance((-2.54, 54.644291, -6.47954))[0], mode=Mode.SUBTRACT)

    # Fillet1
    # the kernel refuses this fillet: 1.27 mm, written as the material it adds along each edge
    with BuildSketch(Plane(origin=(-2.54, 10.51433099, -1.47066), x_dir=(0, 0, -1), z_dir=(1, 0, 0)), Plane(origin=(-2.54, 50.77333099, -21.38934), x_dir=(0, 0, 1), z_dir=(1, 0, 0))) as fillet1_piece_1:
        with BuildLine():
            CenterArc((1.255631216, 1.27), FILLET1_R, 188.626926559, 81.373073441)
            Line((0, 1.0795), (-0.025112624, 1.07569))
            ThreePointArc((-0.025112624, 1.07569), (-0.0254, 0.53975), (-0.0254, 0))
            Line((-0.0254, 0), (0, -0.0254))
            Line((0, -0.0254), (1.255631216, -0.0254))
            Line((1.255631216, -0.0254), (1.255631216, 0))
        make_face()
    extrude(amount=2.54)
    with BuildSketch(Plane(origin=(-2.54, 10.51433099, -21.38934), x_dir=(0, 1, 0), z_dir=(1, 0, 0)), Plane(origin=(-2.54, 50.77333099, -1.47066), x_dir=(0, -1, 0), z_dir=(1, 0, 0))) as fillet1_piece_2:
        with BuildLine():
            CenterArc((1.27, 1.255631216), FILLET1_R, 180, 81.373073441)
            Line((0, 1.255631216), (-0.0254, 1.255631216))
            Line((-0.0254, 1.255631216), (-0.0254, 0))
            Line((-0.0254, 0), (0, -0.0254))
            ThreePointArc((0, -0.0254), (0.53975, -0.0254), (1.07569, -0.025112624))
            Line((1.07569, -0.025112624), (1.0795, 0))
        make_face()
    extrude(amount=2.54)

    # Fillet2
    fillet2_edges = [part.edges().sort_by_distance(p)[0] for p in [
        (40.64, 76.2, -11.43),
        (0, 0, -11.43),
        (0, 62.946915495, -22.86),
        (19.05, 0, 0),
        (0, 62.946915495, 0),
        (38.1, 0, -11.43),
        (38.1, 38.1, 0),
        (19.05, 0, -22.86),
        (38.1, 38.1, -22.86),
        (0, 76.2, -11.43),
        (19.05, 76.2, -25.4),
        (19.05, 76.2, 0),
        (38.1, 76.2, -11.43),
        (19.05, 76.2, -22.86),
        (-2.54, 76.2, -11.43),
        (19.05, 0, -25.4),
        (0, 5.796915495, -22.86),
        (0, 5.796915495, 0),
        (40.64, 0, -11.43),
        (19.05, 0, 2.54),
        (-2.54, 0, -11.43),
        (-2.54, 38.1, -25.4),
        (40.64, 38.1, -25.4),
        (40.64, 38.1, 2.54),
        (-2.54, 38.1, 2.54),
        (19.05, 76.2, 2.54),
    ]]
    fillet(fillet2_edges, radius=FILLET2_R - 0.0001)  # a hair under: the kernel refuses the full size


solid = part.part
